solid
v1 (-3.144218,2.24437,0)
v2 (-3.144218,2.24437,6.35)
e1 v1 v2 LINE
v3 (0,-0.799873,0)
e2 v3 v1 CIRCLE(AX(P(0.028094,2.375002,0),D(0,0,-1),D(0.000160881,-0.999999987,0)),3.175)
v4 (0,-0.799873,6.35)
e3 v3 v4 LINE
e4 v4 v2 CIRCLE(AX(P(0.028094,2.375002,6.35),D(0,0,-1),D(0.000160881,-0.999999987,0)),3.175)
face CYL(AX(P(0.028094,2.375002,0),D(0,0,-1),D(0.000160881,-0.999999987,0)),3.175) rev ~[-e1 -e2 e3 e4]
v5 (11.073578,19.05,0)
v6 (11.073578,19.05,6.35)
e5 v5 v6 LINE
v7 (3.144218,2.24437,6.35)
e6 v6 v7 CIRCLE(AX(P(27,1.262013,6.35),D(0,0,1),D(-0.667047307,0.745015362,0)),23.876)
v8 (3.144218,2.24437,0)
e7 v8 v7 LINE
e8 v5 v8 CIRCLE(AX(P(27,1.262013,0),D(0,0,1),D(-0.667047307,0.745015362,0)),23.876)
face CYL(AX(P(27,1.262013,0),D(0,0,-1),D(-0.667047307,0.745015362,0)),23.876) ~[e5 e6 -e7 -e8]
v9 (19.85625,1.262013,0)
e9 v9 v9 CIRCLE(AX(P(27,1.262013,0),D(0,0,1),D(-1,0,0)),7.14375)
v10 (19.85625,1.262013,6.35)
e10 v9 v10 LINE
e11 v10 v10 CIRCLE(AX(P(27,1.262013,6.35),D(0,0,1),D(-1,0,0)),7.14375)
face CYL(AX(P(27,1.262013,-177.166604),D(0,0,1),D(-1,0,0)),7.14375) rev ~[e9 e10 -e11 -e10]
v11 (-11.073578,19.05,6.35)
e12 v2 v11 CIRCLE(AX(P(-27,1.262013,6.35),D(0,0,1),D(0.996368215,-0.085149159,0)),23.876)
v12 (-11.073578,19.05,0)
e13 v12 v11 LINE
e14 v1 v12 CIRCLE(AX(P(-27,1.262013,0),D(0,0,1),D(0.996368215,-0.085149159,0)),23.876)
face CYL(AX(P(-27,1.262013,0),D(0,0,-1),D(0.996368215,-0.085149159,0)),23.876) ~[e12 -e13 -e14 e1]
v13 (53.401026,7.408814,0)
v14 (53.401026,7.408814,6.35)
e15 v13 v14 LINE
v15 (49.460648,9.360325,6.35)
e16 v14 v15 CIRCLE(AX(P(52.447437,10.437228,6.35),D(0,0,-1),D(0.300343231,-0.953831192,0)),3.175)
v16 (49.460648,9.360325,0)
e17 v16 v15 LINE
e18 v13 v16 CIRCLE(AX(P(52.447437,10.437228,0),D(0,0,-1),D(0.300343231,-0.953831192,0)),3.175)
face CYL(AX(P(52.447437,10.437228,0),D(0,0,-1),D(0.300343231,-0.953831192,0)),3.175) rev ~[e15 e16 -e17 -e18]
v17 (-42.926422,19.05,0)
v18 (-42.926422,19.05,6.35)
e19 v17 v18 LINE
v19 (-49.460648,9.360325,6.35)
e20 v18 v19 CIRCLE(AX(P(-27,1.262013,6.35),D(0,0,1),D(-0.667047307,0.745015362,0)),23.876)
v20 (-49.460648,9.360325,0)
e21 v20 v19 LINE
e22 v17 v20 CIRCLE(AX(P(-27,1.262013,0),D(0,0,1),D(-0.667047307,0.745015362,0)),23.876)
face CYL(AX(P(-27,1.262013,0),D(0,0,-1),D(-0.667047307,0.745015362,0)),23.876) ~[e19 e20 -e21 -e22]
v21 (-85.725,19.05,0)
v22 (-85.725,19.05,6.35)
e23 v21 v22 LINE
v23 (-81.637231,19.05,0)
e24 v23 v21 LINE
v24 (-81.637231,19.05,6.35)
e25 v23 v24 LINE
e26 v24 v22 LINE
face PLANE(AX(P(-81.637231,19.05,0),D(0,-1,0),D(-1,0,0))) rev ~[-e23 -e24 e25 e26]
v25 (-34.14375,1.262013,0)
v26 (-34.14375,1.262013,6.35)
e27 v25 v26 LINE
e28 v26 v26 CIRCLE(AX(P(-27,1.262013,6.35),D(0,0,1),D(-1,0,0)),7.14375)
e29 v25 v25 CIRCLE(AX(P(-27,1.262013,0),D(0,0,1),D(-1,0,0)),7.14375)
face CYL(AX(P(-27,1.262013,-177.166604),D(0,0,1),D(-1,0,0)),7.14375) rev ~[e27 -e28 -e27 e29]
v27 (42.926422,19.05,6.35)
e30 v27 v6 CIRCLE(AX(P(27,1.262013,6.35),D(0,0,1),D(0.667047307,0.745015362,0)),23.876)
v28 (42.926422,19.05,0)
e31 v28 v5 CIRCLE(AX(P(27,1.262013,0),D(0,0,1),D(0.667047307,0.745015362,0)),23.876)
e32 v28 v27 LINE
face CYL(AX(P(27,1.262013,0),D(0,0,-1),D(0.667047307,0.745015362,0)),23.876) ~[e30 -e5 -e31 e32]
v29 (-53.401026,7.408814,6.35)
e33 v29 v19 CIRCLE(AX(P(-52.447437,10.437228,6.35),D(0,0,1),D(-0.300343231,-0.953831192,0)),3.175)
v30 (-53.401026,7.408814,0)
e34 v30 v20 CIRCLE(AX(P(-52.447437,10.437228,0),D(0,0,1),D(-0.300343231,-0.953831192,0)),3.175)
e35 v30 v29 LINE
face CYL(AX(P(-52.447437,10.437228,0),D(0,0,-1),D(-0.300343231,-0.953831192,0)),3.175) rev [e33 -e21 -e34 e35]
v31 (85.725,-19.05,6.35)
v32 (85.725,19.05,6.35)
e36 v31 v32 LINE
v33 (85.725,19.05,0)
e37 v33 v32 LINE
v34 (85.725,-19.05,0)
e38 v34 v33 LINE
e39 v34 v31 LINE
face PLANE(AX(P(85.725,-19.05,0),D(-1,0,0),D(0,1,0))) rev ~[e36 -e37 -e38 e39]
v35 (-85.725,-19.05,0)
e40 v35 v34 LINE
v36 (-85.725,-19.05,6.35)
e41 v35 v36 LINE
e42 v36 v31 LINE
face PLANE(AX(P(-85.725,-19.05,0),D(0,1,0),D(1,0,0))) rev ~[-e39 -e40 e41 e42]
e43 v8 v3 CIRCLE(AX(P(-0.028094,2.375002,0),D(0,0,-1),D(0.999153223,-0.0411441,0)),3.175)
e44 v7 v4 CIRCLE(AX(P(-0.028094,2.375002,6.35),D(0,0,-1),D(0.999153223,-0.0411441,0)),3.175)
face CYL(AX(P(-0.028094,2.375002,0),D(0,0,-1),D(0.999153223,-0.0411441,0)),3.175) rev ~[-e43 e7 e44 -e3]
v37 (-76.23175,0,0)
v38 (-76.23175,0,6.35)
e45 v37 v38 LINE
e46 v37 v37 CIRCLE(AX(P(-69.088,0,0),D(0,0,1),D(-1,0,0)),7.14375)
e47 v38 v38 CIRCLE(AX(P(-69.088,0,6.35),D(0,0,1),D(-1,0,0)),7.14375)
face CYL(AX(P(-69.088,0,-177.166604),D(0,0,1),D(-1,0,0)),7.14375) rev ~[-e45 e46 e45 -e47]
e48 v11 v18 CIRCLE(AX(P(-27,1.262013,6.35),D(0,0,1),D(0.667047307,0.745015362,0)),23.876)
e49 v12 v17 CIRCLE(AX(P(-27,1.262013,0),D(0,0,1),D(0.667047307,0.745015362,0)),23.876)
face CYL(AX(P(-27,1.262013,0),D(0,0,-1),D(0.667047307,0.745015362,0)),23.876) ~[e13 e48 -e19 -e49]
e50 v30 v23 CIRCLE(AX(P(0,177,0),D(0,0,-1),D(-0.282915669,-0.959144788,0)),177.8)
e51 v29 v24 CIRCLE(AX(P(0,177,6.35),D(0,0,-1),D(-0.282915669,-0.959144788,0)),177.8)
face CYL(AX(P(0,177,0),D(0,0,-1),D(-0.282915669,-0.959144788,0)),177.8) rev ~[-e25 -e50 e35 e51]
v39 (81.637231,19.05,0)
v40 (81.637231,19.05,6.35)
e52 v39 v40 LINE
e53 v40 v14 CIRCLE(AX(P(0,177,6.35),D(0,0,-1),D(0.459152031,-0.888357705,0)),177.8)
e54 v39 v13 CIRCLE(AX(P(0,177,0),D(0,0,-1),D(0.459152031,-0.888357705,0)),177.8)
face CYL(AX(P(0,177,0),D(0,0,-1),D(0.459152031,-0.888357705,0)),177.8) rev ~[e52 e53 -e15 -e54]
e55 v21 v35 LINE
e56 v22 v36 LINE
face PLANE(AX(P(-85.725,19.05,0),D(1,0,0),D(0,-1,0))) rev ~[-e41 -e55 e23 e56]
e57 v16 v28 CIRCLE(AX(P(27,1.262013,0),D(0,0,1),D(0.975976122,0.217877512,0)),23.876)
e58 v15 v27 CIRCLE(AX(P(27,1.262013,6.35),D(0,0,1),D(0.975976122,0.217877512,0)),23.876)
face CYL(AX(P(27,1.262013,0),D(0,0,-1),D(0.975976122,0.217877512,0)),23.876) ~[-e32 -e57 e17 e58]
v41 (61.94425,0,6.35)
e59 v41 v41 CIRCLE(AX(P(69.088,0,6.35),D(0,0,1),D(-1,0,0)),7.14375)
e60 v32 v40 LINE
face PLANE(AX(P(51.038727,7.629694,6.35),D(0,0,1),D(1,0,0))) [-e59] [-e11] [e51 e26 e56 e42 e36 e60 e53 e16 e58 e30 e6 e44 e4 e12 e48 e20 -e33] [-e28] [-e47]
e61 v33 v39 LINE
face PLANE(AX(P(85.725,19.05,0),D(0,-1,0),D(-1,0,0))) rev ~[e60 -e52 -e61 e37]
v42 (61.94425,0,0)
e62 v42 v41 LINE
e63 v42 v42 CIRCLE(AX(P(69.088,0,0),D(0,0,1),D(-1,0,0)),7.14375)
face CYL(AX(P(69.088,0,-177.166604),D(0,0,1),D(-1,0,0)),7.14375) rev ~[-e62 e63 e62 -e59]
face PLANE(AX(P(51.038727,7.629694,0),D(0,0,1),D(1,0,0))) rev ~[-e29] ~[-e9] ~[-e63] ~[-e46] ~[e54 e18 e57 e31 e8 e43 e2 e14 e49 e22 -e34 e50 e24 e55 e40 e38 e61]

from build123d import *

# Parameters (mm, degrees)
F1_DEPTH    = 6.35
F2_T1_DEPTH = 6.35
F3_D        = 14.2875


# Not quite as in the source:
# - a fillet or chamfer that OpenCascade refuses, or shapes differently, is made with other operations: its cross-section is extruded or revolved along the edge and cut away or added
# - a length typed as a fraction of an inch, garbled in the dataset ("3 / 203.2 mm" for 3/8 in), is restored


with BuildPart() as f1:
    # F0 (on Top) → F1 (new body)
    with BuildSketch(Plane.XY):
        with BuildLine():
            Line((-81.6372310897, 19.05), (-85.725, 19.05))
            Line((-85.725, 19.05), (-85.725, -19.05))
            Line((-85.725, -19.05), (-39.5493225013, -19.05))
            Line((-39.5493225013, -19.05), (85.725, -19.05))
            Line((85.725, -19.05), (85.725, 19.05))
            Line((85.725, 19.05), (81.6372310897, 19.05))
            ThreePointArc((81.6372310897, 19.05), (66.2692873292, 12.0114502249), (50.3024058786, 6.4640566836))
            ThreePointArc((50.3024058786, 6.4640566836), (47.5991921402, 13.3341571472), (42.9264215083, 19.05))
            Line((42.9264215083, 19.05), (11.0735784917, 19.05))
            ThreePointArc((11.0735784917, 19.05), (4.806476702, 10.0660406788), (3.2107124888, -0.7710081124))
            ThreePointArc((3.2107124888, -0.7710081124), (0, -0.8), (-3.2107124888, -0.7710081124))
            ThreePointArc((-3.2107124888, -0.7710081124), (-4.806476702, 10.0660406788), (-11.0735784917, 19.05))
            Line((-11.0735784917, 19.05), (-42.9264215083, 19.05))
            ThreePointArc((-42.9264215083, 19.05), (-47.5991921402, 13.3341571472), (-50.3024058786, 6.4640566836))
            ThreePointArc((-50.3024058786, 6.4640566836), (-66.2692873292, 12.0114502249), (-81.6372310897, 19.05))
        make_face()
        with BuildLine():
            ThreePointArc((-11.0735784917, 19.05), (-27, 25.1380132129), (-42.9264215083, 19.05))
            Line((-42.9264215083, 19.05), (-11.0735784917, 19.05))
        make_face()
        with BuildLine():
            ThreePointArc((42.9264215083, 19.05), (27, 25.1380132129), (11.0735784917, 19.05))
            Line((11.0735784917, 19.05), (42.9264215083, 19.05))
        make_face()
    extrude(amount=F1_DEPTH)

    # F2: fillet of radius 3.175 on 4 edges, made by hand

    # F2_s2 → F2_t1 (join)
    with BuildSketch(Plane.XY):
        with BuildLine():
            ThreePointArc((53.4010264507, 7.4088139849), (51.0383331441, 7.5920475012), (49.4606483484, 9.3603248744))
            ThreePointArc((49.4606483484, 9.3603248744), (49.9273063268, 7.9254958305), (50.3024058786, 6.4640566836))
            ThreePointArc((50.3024058786, 6.4640566836), (51.8538678481, 6.9293782301), (53.4010264507, 7.4088139849))
        make_face()
        with BuildLine():
            ThreePointArc((3.1442176475, 2.2443697426), (2.1701152487, 0.084041365), (-0.0286046325, -0.799997699))
            ThreePointArc((-0.0286046325, -0.799997699), (1.5911199519, -0.792880446), (3.2107124888, -0.7710081124))
            ThreePointArc((3.2107124888, -0.7710081124), (3.1298031747, 0.7356297793), (3.1442176475, 2.2443697426))
        make_face()
        with BuildLine():
            ThreePointArc((0.0286046325, -0.799997699), (-2.1701152487, 0.084041365), (-3.1442176475, 2.2443697426))
            ThreePointArc((-3.1442176475, 2.2443697426), (-3.1298031747, 0.7356297793), (-3.2107124888, -0.7710081124))
            ThreePointArc((-3.2107124888, -0.7710081124), (-1.5911199519, -0.792880446), (0.0286046325, -0.799997699))
        make_face()
        with BuildLine():
            ThreePointArc((-53.4010264507, 7.4088139849), (-51.0383331441, 7.5920475012), (-49.4606483484, 9.3603248744))
            ThreePointArc((-49.4606483484, 9.3603248744), (-49.9273063268, 7.9254958305), (-50.3024058786, 6.4640566836))
            ThreePointArc((-50.3024058786, 6.4640566836), (-51.8538678481, 6.9293782301), (-53.4010264507, 7.4088139849))
        make_face()
    extrude(amount=F2_T1_DEPTH)

    # F3 (through all)
    with Locations(Plane(origin=(0, 0, 0), x_dir=(1, 0, 0), z_dir=(0, 0, -1))):
        with Locations((-69.088, 0), (-27, -1.2620132129), (27, -1.2620132129), (69.088, 0)):
            Hole(F3_D / 2)


solid = f1.part
